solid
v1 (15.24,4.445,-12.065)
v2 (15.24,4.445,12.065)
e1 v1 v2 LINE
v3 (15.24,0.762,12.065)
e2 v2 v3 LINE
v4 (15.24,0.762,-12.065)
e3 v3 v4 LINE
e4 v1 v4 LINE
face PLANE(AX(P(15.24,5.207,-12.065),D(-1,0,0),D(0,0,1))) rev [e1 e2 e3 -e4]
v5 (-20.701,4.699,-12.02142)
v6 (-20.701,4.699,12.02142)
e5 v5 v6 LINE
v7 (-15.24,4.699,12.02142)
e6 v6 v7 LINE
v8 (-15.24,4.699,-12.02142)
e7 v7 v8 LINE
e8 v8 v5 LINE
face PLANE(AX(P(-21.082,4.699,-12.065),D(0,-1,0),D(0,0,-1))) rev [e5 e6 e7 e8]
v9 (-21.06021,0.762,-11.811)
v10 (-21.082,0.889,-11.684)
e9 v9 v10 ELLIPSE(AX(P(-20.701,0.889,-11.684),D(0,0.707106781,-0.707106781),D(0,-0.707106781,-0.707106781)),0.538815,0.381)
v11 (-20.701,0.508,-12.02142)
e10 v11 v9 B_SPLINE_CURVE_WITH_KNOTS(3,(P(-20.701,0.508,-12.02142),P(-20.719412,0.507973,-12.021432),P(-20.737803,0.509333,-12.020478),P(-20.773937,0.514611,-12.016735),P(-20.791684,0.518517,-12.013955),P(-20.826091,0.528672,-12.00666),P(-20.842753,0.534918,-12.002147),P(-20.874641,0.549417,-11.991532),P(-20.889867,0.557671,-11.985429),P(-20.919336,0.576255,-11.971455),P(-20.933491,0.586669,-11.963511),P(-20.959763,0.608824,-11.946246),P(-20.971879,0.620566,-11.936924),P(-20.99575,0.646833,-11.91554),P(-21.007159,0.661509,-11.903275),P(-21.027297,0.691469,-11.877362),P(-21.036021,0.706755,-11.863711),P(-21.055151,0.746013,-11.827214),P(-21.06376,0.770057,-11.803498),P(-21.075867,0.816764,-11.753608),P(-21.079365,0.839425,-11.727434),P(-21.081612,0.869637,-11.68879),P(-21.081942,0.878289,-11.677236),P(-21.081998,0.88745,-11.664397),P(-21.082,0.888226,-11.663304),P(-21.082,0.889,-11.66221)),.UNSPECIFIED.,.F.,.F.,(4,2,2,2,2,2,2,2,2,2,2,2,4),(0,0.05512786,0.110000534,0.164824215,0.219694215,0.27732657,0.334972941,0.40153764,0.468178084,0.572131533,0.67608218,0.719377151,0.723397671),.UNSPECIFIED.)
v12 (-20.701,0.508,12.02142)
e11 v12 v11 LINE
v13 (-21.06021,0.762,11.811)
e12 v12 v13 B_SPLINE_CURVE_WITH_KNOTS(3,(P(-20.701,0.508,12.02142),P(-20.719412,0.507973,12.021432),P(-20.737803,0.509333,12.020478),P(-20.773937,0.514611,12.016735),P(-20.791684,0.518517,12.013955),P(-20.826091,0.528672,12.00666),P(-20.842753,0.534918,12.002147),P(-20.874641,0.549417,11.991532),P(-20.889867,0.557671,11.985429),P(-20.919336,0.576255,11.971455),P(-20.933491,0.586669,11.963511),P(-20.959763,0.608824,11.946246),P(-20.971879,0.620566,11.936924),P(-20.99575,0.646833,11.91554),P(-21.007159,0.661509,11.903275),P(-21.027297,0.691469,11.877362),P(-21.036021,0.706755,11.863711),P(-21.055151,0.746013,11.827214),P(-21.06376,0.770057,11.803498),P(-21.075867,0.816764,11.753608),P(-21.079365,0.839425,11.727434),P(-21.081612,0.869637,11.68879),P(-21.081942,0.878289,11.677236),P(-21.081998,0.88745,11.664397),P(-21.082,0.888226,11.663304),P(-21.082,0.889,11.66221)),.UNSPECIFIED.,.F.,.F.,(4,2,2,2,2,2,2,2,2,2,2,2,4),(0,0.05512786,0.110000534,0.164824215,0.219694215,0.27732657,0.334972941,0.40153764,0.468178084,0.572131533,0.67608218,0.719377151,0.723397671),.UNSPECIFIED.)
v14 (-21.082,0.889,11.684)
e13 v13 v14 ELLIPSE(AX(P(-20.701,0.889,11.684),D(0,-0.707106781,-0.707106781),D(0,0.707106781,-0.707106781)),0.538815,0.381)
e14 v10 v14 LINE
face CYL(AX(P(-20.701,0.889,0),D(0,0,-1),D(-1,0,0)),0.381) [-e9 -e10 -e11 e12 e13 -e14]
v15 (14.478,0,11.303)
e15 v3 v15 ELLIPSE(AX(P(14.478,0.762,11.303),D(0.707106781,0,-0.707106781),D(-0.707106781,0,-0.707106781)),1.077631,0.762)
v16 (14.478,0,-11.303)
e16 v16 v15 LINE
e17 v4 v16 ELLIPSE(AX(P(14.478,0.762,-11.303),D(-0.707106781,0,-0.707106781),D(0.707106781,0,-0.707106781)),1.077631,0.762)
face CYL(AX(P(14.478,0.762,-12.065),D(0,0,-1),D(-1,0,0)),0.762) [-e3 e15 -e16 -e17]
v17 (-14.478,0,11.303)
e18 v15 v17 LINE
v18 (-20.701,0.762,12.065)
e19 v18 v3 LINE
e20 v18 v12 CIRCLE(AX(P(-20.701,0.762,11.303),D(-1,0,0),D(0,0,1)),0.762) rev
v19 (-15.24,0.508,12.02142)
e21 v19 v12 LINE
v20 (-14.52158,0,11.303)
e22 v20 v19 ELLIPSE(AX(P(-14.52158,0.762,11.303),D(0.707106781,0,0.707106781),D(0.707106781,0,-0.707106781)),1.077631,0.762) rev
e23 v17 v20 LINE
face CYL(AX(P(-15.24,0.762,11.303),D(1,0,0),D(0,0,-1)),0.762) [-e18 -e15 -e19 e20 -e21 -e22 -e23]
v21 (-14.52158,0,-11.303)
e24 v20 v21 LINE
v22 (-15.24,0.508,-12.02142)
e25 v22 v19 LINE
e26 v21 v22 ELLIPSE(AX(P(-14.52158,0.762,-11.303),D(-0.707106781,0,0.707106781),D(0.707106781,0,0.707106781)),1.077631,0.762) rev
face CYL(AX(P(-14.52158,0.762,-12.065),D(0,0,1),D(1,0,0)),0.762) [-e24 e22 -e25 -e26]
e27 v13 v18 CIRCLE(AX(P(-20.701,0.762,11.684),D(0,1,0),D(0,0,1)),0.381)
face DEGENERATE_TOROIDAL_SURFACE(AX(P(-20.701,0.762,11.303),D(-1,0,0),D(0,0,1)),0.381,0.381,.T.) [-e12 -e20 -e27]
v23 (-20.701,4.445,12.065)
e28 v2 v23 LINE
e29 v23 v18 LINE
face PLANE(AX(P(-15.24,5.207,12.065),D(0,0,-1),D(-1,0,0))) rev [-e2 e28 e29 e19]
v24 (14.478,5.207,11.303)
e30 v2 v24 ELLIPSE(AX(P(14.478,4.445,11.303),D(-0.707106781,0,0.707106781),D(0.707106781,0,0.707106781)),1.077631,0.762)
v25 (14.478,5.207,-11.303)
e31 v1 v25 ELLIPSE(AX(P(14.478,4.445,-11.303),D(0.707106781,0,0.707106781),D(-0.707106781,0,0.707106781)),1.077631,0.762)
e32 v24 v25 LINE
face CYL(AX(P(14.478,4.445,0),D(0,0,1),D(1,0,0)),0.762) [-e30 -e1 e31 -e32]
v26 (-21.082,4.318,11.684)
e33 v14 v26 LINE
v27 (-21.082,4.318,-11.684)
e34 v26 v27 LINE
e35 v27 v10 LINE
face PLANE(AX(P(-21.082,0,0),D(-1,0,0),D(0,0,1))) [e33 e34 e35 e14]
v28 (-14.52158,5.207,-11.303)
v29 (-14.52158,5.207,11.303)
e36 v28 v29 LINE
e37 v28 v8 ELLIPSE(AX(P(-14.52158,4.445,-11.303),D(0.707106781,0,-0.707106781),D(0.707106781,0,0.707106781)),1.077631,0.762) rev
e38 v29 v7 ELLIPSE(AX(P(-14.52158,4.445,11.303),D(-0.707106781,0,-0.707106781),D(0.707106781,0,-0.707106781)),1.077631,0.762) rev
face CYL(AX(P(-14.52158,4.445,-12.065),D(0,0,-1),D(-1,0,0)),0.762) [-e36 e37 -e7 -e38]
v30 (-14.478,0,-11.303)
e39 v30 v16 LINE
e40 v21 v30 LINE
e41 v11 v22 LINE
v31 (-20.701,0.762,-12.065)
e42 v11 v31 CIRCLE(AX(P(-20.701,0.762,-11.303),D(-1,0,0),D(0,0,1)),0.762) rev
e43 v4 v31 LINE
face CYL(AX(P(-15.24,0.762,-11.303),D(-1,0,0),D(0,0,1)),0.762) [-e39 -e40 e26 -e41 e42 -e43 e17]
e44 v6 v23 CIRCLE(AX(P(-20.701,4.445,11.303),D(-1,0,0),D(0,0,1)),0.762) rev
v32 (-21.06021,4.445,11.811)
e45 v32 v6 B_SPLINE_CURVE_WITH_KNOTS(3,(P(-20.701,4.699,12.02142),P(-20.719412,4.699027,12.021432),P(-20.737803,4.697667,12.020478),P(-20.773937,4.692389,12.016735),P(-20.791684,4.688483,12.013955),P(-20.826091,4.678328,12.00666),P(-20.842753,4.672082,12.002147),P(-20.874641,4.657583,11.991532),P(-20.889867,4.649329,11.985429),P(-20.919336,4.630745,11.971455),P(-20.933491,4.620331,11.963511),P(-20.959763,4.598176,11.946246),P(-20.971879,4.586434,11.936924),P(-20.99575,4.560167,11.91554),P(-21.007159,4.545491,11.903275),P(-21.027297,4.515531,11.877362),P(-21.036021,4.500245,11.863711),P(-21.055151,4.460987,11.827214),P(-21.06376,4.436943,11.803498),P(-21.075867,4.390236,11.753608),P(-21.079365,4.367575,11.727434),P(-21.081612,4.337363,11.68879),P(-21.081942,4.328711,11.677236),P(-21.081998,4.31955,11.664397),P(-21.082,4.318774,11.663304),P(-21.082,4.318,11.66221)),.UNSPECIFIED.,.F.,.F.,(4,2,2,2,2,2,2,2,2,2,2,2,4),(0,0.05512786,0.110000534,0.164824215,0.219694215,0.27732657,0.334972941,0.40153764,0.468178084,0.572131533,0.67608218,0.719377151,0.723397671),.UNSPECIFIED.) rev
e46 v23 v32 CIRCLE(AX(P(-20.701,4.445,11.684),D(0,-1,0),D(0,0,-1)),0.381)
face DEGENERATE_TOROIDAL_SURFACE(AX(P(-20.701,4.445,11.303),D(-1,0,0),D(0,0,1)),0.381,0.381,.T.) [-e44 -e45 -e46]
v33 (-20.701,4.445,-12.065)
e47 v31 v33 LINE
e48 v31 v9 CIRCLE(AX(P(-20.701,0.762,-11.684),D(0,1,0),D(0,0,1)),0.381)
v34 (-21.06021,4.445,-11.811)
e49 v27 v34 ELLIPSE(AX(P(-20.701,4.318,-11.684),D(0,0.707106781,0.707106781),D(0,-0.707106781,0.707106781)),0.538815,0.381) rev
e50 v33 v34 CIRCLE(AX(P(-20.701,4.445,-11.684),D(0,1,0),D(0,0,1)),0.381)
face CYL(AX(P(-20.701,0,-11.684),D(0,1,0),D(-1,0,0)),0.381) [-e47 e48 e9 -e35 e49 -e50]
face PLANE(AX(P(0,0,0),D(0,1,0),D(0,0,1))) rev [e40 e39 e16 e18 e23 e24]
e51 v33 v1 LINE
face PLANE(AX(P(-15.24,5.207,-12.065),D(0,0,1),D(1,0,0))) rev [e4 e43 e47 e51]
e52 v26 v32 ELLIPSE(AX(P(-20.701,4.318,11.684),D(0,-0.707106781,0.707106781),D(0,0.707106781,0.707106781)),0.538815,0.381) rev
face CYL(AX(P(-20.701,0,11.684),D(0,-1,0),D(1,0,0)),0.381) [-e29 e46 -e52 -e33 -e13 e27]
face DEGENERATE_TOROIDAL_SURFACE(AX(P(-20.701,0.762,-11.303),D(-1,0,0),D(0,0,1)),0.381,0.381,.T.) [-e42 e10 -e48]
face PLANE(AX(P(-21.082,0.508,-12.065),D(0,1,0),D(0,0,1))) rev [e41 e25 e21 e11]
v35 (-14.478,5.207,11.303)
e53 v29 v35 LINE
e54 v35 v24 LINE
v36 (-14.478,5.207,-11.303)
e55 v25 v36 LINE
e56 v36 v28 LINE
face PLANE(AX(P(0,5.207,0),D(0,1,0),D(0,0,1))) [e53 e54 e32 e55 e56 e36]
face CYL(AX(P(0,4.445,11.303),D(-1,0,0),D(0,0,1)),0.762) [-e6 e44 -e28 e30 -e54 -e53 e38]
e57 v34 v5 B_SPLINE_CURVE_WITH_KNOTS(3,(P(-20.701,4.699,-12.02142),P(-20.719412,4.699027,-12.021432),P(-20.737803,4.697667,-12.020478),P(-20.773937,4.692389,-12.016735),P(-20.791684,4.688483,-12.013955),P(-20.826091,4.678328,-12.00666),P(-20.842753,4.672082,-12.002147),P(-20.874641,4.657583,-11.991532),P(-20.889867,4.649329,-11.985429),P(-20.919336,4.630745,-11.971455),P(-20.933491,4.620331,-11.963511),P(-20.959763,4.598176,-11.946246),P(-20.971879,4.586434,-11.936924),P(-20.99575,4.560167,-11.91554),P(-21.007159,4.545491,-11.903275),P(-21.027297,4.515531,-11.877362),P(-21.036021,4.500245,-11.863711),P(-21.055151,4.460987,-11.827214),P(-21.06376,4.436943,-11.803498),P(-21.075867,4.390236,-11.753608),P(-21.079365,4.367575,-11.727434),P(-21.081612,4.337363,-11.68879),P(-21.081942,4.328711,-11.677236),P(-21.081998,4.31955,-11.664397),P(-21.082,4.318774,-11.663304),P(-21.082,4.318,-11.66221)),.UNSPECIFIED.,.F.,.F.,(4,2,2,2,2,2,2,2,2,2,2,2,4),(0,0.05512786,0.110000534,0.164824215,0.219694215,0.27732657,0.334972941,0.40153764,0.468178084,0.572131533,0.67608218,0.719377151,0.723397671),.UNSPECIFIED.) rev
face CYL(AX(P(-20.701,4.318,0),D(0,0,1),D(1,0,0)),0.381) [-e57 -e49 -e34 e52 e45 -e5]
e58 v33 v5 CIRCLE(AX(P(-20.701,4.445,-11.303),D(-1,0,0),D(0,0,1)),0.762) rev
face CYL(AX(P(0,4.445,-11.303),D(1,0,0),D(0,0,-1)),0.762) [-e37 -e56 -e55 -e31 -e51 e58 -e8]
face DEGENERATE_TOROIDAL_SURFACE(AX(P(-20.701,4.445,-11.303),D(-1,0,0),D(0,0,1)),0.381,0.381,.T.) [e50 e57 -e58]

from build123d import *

# Parameters (mm, degrees)
SKETCH1_W           = 30.48
SKETCH1_H           = 24.13
BOSS_EXTRUDE1_DEPTH = 5.207
SKETCH2_W           = 24.13
SKETCH2_H           = 4.191
BOSS_EXTRUDE2_DEPTH = 5.842
FILLET5_START       = -22
FILLET5_DEPTH       = 37.24
FILLET5_START_2     = -13
FILLET5_2_DEPTH     = 26
FILLET4_R           = 0.381


with BuildPart() as part:
    # Sketch1 → Boss-Extrude1 (new body)
    with BuildSketch(Plane(origin=(0, 0, 0), x_dir=(1, 0, 0), z_dir=(0, 1, 0))):
        Rectangle(SKETCH1_W, SKETCH1_H)
    extrude(amount=BOSS_EXTRUDE1_DEPTH)

    # Sketch2 → Boss-Extrude2 (add)
    with BuildSketch(Plane.ZY.offset(15.24)):
        with Locations((0, 2.6035)):
            Rectangle(SKETCH2_W, SKETCH2_H)
    extrude(amount=BOSS_EXTRUDE2_DEPTH)

    # Fillet5: read off the stored shape, not the designer's step
    # Fillet5 outline → Fillet5 (cut)
    with BuildSketch(Plane.YZ.offset(FILLET5_START)):
        with BuildLine():
            Line((4.445, -12.065), (5.207, -12.065))
            Line((5.207, -12.065), (5.207, -11.303))
            ThreePointArc((5.207, -11.303), (4.983815367, -11.841815367), (4.445, -12.065))
        make_face()
        with BuildLine():
            ThreePointArc((0.762, -12.065), (0.223184633, -11.841815367), (0, -11.303))
            Line((0, -11.303), (0, -12.065))
            Line((0, -12.065), (0.762, -12.065))
        make_face()
        with BuildLine():
            Line((5.207, 12.065), (4.445, 12.065))
            ThreePointArc((4.445, 12.065), (4.983815367, 11.841815367), (5.207, 11.303))
            Line((5.207, 11.303), (5.207, 12.065))
        make_face()
        with BuildLine():
            Line((0.762, 12.065), (0, 12.065))
            Line((0, 12.065), (0, 11.303))
            ThreePointArc((0, 11.303), (0.223184633, 11.841815367), (0.762, 12.065))
        make_face()
    extrude(amount=FILLET5_DEPTH, mode=Mode.SUBTRACT)

    # Fillet5 2 outline → Fillet5 2 (cut)
    with BuildSketch(Plane.XY.offset(FILLET5_START_2)):
        with BuildLine():
            Line((-15.24, 5.207), (-15.24, 4.699))
            ThreePointArc((-15.24, 4.699), (-14.961520415, 5.067170395), (-14.52157951, 5.207))
            Line((-14.52157951, 5.207), (-15.24, 5.207))
        make_face()
        with BuildLine():
            Line((-15.24, 0), (-14.52157951, 0))
            ThreePointArc((-14.52157951, 0), (-14.961520415, 0.139829605), (-15.24, 0.508))
            Line((-15.24, 0.508), (-15.24, 0))
        make_face()
        with BuildLine():
            Line((15.24, 0), (15.24, 0.762))
            ThreePointArc((15.24, 0.762), (15.016815367, 0.223184633), (14.478, 0))
            Line((14.478, 0), (15.24, 0))
        make_face()
        with BuildLine():
            Line((15.24, 5.207), (14.478, 5.207))
            ThreePointArc((14.478, 5.207), (15.016815367, 4.983815367), (15.24, 4.445))
            Line((15.24, 4.445), (15.24, 5.207))
        make_face()
    extrude(amount=FILLET5_2_DEPTH, mode=Mode.SUBTRACT)

    # Fillet4
    # the kernel refuses this fillet: 0.381 mm, written as the material it takes off along each edge
    with BuildSketch(Plane(origin=(-21.082, 0.762, -12.065), x_dir=(1, 0, 0), z_dir=(0, 1, 0))) as fillet4_piece_1:
        with BuildLine():
            CenterArc((FILLET4_R, -FILLET4_R), FILLET4_R, 90, 90)
            Line((0, -FILLET4_R), (0, 0))
            Line((0, 0), (FILLET4_R, 0))
        make_face()
    extrude(amount=3.683, mode=Mode.SUBTRACT)
    with BuildSketch(Plane(origin=(-21.082, 4.445, 12.065), x_dir=(0, 0, -1), z_dir=(0, -1, 0))) as fillet4_piece_2:
        with BuildLine():
            CenterArc((FILLET4_R, FILLET4_R), FILLET4_R, 180, 90)
            Line((0, FILLET4_R), (0, 0))
            Line((0, 0), (FILLET4_R, 0))
        make_face()
    extrude(amount=3.683, mode=Mode.SUBTRACT)
    with BuildSketch(Plane(origin=(-21.082, 0.508, 12.973920489), x_dir=(0, 1, 0), z_dir=(0, 0, -1)), Plane(origin=(-21.082, 4.699, -12.973920489), x_dir=(0, -1, 0), z_dir=(0, 0, 1))) as fillet4_piece_3:
        with BuildLine():
            CenterArc((FILLET4_R, FILLET4_R), FILLET4_R, 180, 90)
            Line((0, FILLET4_R), (0, 0))
            Line((0, 0), (FILLET4_R, 0))
        make_face()
    extrude(amount=25.947840979, mode=Mode.SUBTRACT)
    with BuildSketch(Plane(origin=(-21.082, 4.444999999, 11.302999999), x_dir=(0, 1.1835443663887322e-09, 1.0), z_dir=(0, -1.0, 1.1835443663887322e-09))) as fillet4_piece_4:
        with BuildLine():
            CenterArc((0.762000001 - FILLET4_R, -FILLET4_R), FILLET4_R, 0, 90)
            Line((0.762000001, -FILLET4_R), (0.762000001, 0))
            Line((0.762000001, 0), (0.762000001 - FILLET4_R, 0))
        make_face()
    revolve(axis=Axis((-21.082, 4.444999999, 11.302999999), (-1, 0, 0)), revolution_arc=91.092291179, mode=Mode.SUBTRACT)
    with BuildSketch(Plane(origin=(-21.082, 0.762000001, 11.302999999), x_dir=(0, -0.9998182859562426, -0.019062923897481165), z_dir=(0, 0.019062923897481165, -0.9998182859562426))) as fillet4_piece_5:
        with BuildLine():
            CenterArc((0.762000001 - FILLET4_R, -FILLET4_R), FILLET4_R, 0, 90)
            Line((0.762000001, -FILLET4_R), (0.762000001, 0))
            Line((0.762000001, 0), (0.762000001 - FILLET4_R, 0))
        make_face()
    revolve(axis=Axis((-21.082, 0.762000001, 11.302999999), (-1, 0, 0)), revolution_arc=91.092291179, mode=Mode.SUBTRACT)
    with BuildSketch(Plane(origin=(-21.082, 0.762000001, -11.302999999), x_dir=(0, -1.1835437835944942e-09, -1.0), z_dir=(0, 1.0, -1.1835437835944942e-09))) as fillet4_piece_6:
        with BuildLine():
            CenterArc((0.762000001 - FILLET4_R, -FILLET4_R), FILLET4_R, 360, 90)
            Line((0.762000001, -FILLET4_R), (0.762000001, 0))
            Line((0.762000001, 0), (0.762000001 - FILLET4_R, 0))
        make_face()
    revolve(axis=Axis((-21.082, 0.762000001, -11.302999999), (-1, 0, 0)), revolution_arc=91.092291179, mode=Mode.SUBTRACT)
    with BuildSketch(Plane(origin=(-21.082, 4.444999999, -11.302999999), x_dir=(0, 0.9998182859562423, 0.019062923897497485), z_dir=(0, -0.019062923897497485, 0.9998182859562423))) as fillet4_piece_7:
        with BuildLine():
            CenterArc((0.762000001 - FILLET4_R, -FILLET4_R), FILLET4_R, 0, 90)
            Line((0.762000001 - FILLET4_R, 0), (0.762000001, 0))
            Line((0.762000001, 0), (0.762000001, -FILLET4_R))
        make_face()
    revolve(axis=Axis((-21.082, 4.444999999, -11.302999999), (-1, 0, 0)), revolution_arc=91.092291179, mode=Mode.SUBTRACT)


solid = part.part
